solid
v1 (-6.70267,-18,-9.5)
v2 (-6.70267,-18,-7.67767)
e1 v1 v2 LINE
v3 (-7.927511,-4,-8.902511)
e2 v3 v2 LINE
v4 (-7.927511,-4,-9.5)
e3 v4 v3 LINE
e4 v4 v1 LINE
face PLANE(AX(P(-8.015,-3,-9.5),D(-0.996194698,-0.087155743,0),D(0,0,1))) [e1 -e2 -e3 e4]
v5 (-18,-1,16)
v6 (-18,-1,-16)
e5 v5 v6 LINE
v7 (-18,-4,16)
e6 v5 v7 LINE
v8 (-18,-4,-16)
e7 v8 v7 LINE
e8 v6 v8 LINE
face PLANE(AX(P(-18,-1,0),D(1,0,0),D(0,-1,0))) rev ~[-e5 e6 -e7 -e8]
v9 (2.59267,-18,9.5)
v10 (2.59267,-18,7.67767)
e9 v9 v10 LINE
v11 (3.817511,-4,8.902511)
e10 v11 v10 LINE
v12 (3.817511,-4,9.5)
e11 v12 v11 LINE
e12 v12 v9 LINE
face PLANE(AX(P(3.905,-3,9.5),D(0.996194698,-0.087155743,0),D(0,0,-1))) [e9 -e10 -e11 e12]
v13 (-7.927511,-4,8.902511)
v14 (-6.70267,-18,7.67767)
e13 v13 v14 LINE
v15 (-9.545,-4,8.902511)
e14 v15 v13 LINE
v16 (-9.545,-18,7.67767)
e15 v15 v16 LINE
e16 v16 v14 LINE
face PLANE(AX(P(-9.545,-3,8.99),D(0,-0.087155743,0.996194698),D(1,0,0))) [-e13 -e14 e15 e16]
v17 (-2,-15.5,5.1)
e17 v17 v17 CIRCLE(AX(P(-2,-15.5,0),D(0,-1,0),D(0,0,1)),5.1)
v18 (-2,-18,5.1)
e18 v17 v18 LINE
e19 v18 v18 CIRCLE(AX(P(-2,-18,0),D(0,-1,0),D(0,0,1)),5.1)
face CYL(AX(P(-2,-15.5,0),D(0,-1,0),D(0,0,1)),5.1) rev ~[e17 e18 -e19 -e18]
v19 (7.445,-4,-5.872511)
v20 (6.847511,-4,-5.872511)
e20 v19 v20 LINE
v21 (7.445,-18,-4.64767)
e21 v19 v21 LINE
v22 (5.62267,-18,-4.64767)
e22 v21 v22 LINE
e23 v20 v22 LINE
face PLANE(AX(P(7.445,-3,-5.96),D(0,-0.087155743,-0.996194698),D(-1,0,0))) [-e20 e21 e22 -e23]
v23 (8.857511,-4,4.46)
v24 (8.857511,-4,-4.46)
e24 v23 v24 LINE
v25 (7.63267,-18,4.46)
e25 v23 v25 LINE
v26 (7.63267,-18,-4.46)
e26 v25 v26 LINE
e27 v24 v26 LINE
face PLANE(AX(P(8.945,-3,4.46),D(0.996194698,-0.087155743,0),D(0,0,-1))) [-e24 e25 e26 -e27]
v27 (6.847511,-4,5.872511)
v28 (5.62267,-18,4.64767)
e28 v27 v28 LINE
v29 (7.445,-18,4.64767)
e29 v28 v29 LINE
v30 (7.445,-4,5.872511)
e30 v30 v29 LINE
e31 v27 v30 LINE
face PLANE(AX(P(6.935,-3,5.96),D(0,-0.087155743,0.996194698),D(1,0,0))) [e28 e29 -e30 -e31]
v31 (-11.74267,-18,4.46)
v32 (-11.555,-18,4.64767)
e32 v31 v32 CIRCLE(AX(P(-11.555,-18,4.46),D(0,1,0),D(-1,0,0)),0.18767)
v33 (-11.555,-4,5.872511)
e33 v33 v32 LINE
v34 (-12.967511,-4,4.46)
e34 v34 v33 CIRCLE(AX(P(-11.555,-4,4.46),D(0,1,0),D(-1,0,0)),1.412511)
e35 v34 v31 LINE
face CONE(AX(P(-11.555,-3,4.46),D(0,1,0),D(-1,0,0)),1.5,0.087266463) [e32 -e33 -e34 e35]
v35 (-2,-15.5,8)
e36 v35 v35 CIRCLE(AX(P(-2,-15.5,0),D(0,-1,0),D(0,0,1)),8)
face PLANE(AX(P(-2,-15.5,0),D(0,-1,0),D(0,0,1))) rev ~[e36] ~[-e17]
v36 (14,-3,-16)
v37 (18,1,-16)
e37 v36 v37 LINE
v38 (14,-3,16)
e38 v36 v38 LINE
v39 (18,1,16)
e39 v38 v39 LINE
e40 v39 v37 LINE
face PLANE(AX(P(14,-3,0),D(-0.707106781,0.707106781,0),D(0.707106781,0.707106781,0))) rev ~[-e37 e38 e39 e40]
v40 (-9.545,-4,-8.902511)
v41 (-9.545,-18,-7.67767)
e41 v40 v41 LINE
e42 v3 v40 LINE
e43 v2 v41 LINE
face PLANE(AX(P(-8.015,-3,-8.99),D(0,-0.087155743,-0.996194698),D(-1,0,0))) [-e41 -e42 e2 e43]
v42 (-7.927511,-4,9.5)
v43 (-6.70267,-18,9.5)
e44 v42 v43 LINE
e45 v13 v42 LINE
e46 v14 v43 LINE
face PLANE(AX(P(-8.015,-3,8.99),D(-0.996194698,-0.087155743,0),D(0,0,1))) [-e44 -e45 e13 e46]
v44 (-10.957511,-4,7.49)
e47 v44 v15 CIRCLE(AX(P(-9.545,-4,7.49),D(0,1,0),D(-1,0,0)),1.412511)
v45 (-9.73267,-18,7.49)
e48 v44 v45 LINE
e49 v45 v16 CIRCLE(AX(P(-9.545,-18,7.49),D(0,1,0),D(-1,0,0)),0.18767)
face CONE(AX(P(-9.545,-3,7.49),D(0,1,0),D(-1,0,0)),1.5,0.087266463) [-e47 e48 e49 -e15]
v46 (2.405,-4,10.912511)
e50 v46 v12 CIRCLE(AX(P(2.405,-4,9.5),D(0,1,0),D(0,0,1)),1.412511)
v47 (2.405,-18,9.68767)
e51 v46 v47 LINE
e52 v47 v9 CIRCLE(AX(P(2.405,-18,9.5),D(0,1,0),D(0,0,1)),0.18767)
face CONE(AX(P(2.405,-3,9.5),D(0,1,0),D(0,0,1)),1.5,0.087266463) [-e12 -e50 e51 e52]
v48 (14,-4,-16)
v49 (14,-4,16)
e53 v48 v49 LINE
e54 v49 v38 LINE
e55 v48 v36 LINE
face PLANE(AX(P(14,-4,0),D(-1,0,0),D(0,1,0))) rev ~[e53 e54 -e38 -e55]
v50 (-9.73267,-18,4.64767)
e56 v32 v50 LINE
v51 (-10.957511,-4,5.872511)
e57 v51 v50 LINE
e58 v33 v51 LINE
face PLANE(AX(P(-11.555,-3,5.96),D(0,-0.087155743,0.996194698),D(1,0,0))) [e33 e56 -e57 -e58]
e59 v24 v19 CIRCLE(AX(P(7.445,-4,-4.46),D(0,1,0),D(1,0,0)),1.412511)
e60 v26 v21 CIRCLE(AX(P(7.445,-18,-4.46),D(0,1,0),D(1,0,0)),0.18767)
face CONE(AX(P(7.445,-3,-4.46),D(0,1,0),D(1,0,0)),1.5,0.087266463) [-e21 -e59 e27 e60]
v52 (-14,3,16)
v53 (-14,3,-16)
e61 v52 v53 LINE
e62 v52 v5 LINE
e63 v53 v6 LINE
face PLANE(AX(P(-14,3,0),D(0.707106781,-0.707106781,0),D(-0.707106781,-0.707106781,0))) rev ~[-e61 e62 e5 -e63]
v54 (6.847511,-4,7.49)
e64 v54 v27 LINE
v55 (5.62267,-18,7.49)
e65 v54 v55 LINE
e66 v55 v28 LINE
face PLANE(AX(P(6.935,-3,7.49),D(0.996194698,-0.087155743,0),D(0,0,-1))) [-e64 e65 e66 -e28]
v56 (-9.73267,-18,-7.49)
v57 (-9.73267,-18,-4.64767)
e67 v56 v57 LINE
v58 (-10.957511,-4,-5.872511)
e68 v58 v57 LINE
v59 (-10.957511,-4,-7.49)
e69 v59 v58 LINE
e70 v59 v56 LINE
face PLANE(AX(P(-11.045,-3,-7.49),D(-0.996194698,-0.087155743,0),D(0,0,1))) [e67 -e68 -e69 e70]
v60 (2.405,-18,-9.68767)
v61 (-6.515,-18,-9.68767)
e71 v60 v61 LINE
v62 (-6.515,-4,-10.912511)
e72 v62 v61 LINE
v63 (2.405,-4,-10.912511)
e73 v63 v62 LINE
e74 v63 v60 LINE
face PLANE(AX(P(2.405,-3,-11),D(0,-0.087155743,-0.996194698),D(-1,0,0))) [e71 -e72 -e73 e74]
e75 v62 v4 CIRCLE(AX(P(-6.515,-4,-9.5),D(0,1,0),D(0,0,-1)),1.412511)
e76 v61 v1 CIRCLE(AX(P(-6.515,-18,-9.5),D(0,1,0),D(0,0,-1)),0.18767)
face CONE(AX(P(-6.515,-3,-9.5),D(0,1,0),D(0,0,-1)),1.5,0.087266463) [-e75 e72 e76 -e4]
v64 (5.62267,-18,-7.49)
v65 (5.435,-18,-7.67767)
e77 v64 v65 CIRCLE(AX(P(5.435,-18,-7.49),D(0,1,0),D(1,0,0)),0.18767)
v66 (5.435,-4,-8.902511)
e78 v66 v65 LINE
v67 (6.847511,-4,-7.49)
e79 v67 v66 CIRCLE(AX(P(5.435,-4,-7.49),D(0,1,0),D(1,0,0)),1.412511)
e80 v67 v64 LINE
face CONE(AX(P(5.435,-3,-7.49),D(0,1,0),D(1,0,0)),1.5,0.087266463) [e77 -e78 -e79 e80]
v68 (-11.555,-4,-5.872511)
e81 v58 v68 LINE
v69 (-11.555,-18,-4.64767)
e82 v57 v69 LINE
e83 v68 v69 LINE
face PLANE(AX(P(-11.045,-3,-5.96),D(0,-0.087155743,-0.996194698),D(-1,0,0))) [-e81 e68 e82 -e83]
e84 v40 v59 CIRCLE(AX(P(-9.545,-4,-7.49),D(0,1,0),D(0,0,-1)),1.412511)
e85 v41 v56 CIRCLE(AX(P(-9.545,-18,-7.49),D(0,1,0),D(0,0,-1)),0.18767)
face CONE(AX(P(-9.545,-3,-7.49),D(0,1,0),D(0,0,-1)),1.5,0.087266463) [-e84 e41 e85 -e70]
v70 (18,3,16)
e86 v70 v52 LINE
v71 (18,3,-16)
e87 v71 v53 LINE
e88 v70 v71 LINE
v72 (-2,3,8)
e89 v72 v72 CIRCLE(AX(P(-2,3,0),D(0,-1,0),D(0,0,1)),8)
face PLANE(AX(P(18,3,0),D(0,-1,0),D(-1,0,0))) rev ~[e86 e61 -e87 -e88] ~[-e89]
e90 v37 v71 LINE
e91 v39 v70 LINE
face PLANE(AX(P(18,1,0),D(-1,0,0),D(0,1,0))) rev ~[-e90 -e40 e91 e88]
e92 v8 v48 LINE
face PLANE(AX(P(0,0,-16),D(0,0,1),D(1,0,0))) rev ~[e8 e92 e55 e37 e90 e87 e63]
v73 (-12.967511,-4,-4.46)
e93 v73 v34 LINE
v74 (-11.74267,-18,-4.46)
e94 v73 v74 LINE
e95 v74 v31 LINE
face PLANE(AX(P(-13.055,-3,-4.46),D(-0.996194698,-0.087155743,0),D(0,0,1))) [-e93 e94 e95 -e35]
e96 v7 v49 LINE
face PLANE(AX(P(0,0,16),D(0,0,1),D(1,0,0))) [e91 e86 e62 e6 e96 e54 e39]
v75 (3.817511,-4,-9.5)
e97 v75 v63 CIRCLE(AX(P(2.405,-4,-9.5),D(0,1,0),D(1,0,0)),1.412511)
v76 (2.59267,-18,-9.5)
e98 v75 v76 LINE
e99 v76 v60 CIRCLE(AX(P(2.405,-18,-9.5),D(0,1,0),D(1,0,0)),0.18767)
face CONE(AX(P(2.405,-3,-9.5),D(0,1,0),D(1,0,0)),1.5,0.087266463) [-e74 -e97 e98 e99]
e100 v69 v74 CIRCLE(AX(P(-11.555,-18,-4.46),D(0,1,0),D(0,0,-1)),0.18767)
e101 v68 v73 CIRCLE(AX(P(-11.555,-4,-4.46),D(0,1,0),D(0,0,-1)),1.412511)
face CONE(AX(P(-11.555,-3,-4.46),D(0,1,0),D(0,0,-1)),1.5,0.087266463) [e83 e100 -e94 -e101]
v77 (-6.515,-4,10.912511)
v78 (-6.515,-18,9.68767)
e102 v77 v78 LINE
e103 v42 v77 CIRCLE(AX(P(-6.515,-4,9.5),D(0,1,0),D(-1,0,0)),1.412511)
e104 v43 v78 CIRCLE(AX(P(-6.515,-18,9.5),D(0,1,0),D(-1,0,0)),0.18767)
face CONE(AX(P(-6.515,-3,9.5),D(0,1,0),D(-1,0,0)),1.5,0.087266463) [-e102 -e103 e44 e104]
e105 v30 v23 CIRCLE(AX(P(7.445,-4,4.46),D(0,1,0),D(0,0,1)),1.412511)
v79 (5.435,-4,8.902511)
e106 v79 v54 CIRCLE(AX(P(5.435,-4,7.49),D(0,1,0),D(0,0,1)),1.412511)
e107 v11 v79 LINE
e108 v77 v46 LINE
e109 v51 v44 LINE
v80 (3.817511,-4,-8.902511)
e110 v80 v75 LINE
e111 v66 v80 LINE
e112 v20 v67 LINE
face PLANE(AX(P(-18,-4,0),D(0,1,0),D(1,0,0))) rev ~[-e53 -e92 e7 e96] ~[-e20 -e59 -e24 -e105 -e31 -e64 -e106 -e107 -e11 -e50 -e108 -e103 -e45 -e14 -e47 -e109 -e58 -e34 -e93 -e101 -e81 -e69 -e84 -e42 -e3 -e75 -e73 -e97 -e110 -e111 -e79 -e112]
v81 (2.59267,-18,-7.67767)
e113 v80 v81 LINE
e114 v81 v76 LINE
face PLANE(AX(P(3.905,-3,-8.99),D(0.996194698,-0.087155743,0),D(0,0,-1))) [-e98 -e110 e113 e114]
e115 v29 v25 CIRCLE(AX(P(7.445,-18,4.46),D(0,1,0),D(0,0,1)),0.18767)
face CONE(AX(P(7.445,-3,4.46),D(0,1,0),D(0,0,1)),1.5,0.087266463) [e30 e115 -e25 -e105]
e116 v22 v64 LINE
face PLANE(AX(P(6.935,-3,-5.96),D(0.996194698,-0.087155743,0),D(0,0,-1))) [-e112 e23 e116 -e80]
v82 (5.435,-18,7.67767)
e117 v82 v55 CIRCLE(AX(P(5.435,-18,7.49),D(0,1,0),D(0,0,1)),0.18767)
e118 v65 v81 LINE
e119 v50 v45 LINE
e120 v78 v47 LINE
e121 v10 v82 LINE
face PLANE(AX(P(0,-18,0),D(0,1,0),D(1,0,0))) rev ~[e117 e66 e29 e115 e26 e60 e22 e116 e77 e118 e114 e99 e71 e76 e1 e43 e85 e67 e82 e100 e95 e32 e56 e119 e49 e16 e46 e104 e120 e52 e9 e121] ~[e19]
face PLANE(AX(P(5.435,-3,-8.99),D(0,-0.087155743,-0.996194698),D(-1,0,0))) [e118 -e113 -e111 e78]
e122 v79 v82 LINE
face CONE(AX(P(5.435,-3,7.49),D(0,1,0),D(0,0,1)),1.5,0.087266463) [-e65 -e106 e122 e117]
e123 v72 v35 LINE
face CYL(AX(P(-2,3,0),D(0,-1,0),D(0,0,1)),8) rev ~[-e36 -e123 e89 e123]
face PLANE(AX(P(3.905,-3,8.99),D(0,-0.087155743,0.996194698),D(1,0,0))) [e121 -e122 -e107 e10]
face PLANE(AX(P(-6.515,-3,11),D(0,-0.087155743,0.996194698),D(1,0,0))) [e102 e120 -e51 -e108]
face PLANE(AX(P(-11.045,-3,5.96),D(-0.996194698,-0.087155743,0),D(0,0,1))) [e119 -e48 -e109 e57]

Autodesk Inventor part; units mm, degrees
sketch "Sketch_1" plane through (0, 0, 0) normal (0, 0, 1) x (1, 0, 0)
  line L0 (-18, -4) -> (14, -4)
  line L1 (14, -4) -> (14, -3)
  line L2 (14, -3) -> (18, 1)
  line L3 (18, 1) -> (18, 3)
  line L4 (18, 3) -> (-14, 3)
  line L5 (-14, 3) -> (-18, -1)
  line L6 (-18, -1) -> (-18, -4)
extrude "Extrusion1" add sketch "Sketch_1" along normal mid plane 32
sketch "Sketch_2" plane through (0, -3, 0) normal (0, 1, 0) x (1, 0, 0)
  arc A0 (-13.055, -4.46) -> (-11.555, -5.96) centre (-11.555, -4.46) ccw
  line L0 (-11.555, -5.96) -> (-11.045, -5.96)
  line L1 (-11.045, -5.96) -> (-11.045, -7.49)
  arc A1 (-11.045, -7.49) -> (-9.545, -8.99) centre (-9.545, -7.49) ccw
  line L2 (-9.545, -8.99) -> (-8.015, -8.99)
  line L3 (-8.015, -8.99) -> (-8.015, -9.5)
  arc A2 (-8.015, -9.5) -> (-6.515, -11) centre (-6.515, -9.5) ccw
  line L4 (-6.515, -11) -> (2.405, -11)
  arc A3 (2.405, -11) -> (3.905, -9.5) centre (2.405, -9.5) ccw
  line L5 (3.905, -9.5) -> (3.905, -8.99)
  line L6 (3.905, -8.99) -> (5.435, -8.99)
  arc A4 (5.435, -8.99) -> (6.935, -7.49) centre (5.435, -7.49) ccw
  line L7 (6.935, -7.49) -> (6.935, -5.96)
  line L8 (6.935, -5.96) -> (7.445, -5.96)
  arc A5 (7.445, -5.96) -> (8.945, -4.46) centre (7.445, -4.46) ccw
  line L9 (8.945, -4.46) -> (8.945, 4.46)
  arc A6 (8.945, 4.46) -> (7.445, 5.96) centre (7.445, 4.46) ccw
  line L10 (7.445, 5.96) -> (6.935, 5.96)
  line L11 (6.935, 5.96) -> (6.935, 7.49)
  arc A7 (6.935, 7.49) -> (5.435, 8.99) centre (5.435, 7.49) ccw
  line L12 (5.435, 8.99) -> (3.905, 8.99)
  line L13 (3.905, 8.99) -> (3.905, 9.5)
  arc A8 (3.905, 9.5) -> (2.405, 11) centre (2.405, 9.5) ccw
  line L14 (2.405, 11) -> (-6.515, 11)
  arc A9 (-6.515, 11) -> (-8.015, 9.5) centre (-6.515, 9.5) ccw
  line L15 (-8.015, 9.5) -> (-8.015, 8.99)
  line L16 (-8.015, 8.99) -> (-9.545, 8.99)
  arc A10 (-9.545, 8.99) -> (-11.045, 7.49) centre (-9.545, 7.49) ccw
  line L17 (-11.045, 7.49) -> (-11.045, 5.96)
  line L18 (-11.045, 5.96) -> (-11.555, 5.96)
  arc A11 (-11.555, 5.96) -> (-13.055, 4.46) centre (-11.555, 4.46) ccw
  line L19 (-13.055, 4.46) -> (-13.055, -4.46)
extrude "Extrusion2" add sketch "Sketch_2" against normal blind 15 draft -5
sketch "Sketch3" plane through (-14, 3, 16) normal (0, 1, 0) x (1, 0, 0)
  point P0 (12, 16)
hole "Hole1" at (-2, 3, 0) direction (0, -1, 0) diameter 10.2 depth 21 counterbore diameter 16 counterbore depth 18.5
ref_plane "insrt_to_lock_XY" through (-2, 3, 0) normal (0, 1, 0) x (1, 0, 0)
ref_plane "insrt_to_lock_YZ" through (-2, 3, 0) normal (1, 0, 0) x (0, 0, -1)
ref_plane "insrt_to_lock_ZX" through (-2, 3, 0) normal (0, 0, -1) x (0, 1, 0)
ref_plane "lock_to_body_XY" through (0, 3, 0) normal (0, 1, 0) x (1, 0, 0)
ref_plane "lock_to_body_YZ" through (0, 3, 0) normal (1, 0, 0) x (0, 0, -1)
ref_plane "lock_to_body_ZX" through (0, 3, 0) normal (0, 0, -1) x (0, 1, 0)
ref_plane "washer_XY" through (-2, -18.5, 0) normal (0, 1, 0) x (1, 0, 0)
ref_plane "washer_YZ" through (-2, -18.5, 0) normal (1, 0, 0) x (0, 0, -1)
ref_plane "washer_ZX" through (-2, -18.5, 0) normal (0, 0, -1) x (0, 1, 0)
properties part number "wm_one_door_lock_na"
